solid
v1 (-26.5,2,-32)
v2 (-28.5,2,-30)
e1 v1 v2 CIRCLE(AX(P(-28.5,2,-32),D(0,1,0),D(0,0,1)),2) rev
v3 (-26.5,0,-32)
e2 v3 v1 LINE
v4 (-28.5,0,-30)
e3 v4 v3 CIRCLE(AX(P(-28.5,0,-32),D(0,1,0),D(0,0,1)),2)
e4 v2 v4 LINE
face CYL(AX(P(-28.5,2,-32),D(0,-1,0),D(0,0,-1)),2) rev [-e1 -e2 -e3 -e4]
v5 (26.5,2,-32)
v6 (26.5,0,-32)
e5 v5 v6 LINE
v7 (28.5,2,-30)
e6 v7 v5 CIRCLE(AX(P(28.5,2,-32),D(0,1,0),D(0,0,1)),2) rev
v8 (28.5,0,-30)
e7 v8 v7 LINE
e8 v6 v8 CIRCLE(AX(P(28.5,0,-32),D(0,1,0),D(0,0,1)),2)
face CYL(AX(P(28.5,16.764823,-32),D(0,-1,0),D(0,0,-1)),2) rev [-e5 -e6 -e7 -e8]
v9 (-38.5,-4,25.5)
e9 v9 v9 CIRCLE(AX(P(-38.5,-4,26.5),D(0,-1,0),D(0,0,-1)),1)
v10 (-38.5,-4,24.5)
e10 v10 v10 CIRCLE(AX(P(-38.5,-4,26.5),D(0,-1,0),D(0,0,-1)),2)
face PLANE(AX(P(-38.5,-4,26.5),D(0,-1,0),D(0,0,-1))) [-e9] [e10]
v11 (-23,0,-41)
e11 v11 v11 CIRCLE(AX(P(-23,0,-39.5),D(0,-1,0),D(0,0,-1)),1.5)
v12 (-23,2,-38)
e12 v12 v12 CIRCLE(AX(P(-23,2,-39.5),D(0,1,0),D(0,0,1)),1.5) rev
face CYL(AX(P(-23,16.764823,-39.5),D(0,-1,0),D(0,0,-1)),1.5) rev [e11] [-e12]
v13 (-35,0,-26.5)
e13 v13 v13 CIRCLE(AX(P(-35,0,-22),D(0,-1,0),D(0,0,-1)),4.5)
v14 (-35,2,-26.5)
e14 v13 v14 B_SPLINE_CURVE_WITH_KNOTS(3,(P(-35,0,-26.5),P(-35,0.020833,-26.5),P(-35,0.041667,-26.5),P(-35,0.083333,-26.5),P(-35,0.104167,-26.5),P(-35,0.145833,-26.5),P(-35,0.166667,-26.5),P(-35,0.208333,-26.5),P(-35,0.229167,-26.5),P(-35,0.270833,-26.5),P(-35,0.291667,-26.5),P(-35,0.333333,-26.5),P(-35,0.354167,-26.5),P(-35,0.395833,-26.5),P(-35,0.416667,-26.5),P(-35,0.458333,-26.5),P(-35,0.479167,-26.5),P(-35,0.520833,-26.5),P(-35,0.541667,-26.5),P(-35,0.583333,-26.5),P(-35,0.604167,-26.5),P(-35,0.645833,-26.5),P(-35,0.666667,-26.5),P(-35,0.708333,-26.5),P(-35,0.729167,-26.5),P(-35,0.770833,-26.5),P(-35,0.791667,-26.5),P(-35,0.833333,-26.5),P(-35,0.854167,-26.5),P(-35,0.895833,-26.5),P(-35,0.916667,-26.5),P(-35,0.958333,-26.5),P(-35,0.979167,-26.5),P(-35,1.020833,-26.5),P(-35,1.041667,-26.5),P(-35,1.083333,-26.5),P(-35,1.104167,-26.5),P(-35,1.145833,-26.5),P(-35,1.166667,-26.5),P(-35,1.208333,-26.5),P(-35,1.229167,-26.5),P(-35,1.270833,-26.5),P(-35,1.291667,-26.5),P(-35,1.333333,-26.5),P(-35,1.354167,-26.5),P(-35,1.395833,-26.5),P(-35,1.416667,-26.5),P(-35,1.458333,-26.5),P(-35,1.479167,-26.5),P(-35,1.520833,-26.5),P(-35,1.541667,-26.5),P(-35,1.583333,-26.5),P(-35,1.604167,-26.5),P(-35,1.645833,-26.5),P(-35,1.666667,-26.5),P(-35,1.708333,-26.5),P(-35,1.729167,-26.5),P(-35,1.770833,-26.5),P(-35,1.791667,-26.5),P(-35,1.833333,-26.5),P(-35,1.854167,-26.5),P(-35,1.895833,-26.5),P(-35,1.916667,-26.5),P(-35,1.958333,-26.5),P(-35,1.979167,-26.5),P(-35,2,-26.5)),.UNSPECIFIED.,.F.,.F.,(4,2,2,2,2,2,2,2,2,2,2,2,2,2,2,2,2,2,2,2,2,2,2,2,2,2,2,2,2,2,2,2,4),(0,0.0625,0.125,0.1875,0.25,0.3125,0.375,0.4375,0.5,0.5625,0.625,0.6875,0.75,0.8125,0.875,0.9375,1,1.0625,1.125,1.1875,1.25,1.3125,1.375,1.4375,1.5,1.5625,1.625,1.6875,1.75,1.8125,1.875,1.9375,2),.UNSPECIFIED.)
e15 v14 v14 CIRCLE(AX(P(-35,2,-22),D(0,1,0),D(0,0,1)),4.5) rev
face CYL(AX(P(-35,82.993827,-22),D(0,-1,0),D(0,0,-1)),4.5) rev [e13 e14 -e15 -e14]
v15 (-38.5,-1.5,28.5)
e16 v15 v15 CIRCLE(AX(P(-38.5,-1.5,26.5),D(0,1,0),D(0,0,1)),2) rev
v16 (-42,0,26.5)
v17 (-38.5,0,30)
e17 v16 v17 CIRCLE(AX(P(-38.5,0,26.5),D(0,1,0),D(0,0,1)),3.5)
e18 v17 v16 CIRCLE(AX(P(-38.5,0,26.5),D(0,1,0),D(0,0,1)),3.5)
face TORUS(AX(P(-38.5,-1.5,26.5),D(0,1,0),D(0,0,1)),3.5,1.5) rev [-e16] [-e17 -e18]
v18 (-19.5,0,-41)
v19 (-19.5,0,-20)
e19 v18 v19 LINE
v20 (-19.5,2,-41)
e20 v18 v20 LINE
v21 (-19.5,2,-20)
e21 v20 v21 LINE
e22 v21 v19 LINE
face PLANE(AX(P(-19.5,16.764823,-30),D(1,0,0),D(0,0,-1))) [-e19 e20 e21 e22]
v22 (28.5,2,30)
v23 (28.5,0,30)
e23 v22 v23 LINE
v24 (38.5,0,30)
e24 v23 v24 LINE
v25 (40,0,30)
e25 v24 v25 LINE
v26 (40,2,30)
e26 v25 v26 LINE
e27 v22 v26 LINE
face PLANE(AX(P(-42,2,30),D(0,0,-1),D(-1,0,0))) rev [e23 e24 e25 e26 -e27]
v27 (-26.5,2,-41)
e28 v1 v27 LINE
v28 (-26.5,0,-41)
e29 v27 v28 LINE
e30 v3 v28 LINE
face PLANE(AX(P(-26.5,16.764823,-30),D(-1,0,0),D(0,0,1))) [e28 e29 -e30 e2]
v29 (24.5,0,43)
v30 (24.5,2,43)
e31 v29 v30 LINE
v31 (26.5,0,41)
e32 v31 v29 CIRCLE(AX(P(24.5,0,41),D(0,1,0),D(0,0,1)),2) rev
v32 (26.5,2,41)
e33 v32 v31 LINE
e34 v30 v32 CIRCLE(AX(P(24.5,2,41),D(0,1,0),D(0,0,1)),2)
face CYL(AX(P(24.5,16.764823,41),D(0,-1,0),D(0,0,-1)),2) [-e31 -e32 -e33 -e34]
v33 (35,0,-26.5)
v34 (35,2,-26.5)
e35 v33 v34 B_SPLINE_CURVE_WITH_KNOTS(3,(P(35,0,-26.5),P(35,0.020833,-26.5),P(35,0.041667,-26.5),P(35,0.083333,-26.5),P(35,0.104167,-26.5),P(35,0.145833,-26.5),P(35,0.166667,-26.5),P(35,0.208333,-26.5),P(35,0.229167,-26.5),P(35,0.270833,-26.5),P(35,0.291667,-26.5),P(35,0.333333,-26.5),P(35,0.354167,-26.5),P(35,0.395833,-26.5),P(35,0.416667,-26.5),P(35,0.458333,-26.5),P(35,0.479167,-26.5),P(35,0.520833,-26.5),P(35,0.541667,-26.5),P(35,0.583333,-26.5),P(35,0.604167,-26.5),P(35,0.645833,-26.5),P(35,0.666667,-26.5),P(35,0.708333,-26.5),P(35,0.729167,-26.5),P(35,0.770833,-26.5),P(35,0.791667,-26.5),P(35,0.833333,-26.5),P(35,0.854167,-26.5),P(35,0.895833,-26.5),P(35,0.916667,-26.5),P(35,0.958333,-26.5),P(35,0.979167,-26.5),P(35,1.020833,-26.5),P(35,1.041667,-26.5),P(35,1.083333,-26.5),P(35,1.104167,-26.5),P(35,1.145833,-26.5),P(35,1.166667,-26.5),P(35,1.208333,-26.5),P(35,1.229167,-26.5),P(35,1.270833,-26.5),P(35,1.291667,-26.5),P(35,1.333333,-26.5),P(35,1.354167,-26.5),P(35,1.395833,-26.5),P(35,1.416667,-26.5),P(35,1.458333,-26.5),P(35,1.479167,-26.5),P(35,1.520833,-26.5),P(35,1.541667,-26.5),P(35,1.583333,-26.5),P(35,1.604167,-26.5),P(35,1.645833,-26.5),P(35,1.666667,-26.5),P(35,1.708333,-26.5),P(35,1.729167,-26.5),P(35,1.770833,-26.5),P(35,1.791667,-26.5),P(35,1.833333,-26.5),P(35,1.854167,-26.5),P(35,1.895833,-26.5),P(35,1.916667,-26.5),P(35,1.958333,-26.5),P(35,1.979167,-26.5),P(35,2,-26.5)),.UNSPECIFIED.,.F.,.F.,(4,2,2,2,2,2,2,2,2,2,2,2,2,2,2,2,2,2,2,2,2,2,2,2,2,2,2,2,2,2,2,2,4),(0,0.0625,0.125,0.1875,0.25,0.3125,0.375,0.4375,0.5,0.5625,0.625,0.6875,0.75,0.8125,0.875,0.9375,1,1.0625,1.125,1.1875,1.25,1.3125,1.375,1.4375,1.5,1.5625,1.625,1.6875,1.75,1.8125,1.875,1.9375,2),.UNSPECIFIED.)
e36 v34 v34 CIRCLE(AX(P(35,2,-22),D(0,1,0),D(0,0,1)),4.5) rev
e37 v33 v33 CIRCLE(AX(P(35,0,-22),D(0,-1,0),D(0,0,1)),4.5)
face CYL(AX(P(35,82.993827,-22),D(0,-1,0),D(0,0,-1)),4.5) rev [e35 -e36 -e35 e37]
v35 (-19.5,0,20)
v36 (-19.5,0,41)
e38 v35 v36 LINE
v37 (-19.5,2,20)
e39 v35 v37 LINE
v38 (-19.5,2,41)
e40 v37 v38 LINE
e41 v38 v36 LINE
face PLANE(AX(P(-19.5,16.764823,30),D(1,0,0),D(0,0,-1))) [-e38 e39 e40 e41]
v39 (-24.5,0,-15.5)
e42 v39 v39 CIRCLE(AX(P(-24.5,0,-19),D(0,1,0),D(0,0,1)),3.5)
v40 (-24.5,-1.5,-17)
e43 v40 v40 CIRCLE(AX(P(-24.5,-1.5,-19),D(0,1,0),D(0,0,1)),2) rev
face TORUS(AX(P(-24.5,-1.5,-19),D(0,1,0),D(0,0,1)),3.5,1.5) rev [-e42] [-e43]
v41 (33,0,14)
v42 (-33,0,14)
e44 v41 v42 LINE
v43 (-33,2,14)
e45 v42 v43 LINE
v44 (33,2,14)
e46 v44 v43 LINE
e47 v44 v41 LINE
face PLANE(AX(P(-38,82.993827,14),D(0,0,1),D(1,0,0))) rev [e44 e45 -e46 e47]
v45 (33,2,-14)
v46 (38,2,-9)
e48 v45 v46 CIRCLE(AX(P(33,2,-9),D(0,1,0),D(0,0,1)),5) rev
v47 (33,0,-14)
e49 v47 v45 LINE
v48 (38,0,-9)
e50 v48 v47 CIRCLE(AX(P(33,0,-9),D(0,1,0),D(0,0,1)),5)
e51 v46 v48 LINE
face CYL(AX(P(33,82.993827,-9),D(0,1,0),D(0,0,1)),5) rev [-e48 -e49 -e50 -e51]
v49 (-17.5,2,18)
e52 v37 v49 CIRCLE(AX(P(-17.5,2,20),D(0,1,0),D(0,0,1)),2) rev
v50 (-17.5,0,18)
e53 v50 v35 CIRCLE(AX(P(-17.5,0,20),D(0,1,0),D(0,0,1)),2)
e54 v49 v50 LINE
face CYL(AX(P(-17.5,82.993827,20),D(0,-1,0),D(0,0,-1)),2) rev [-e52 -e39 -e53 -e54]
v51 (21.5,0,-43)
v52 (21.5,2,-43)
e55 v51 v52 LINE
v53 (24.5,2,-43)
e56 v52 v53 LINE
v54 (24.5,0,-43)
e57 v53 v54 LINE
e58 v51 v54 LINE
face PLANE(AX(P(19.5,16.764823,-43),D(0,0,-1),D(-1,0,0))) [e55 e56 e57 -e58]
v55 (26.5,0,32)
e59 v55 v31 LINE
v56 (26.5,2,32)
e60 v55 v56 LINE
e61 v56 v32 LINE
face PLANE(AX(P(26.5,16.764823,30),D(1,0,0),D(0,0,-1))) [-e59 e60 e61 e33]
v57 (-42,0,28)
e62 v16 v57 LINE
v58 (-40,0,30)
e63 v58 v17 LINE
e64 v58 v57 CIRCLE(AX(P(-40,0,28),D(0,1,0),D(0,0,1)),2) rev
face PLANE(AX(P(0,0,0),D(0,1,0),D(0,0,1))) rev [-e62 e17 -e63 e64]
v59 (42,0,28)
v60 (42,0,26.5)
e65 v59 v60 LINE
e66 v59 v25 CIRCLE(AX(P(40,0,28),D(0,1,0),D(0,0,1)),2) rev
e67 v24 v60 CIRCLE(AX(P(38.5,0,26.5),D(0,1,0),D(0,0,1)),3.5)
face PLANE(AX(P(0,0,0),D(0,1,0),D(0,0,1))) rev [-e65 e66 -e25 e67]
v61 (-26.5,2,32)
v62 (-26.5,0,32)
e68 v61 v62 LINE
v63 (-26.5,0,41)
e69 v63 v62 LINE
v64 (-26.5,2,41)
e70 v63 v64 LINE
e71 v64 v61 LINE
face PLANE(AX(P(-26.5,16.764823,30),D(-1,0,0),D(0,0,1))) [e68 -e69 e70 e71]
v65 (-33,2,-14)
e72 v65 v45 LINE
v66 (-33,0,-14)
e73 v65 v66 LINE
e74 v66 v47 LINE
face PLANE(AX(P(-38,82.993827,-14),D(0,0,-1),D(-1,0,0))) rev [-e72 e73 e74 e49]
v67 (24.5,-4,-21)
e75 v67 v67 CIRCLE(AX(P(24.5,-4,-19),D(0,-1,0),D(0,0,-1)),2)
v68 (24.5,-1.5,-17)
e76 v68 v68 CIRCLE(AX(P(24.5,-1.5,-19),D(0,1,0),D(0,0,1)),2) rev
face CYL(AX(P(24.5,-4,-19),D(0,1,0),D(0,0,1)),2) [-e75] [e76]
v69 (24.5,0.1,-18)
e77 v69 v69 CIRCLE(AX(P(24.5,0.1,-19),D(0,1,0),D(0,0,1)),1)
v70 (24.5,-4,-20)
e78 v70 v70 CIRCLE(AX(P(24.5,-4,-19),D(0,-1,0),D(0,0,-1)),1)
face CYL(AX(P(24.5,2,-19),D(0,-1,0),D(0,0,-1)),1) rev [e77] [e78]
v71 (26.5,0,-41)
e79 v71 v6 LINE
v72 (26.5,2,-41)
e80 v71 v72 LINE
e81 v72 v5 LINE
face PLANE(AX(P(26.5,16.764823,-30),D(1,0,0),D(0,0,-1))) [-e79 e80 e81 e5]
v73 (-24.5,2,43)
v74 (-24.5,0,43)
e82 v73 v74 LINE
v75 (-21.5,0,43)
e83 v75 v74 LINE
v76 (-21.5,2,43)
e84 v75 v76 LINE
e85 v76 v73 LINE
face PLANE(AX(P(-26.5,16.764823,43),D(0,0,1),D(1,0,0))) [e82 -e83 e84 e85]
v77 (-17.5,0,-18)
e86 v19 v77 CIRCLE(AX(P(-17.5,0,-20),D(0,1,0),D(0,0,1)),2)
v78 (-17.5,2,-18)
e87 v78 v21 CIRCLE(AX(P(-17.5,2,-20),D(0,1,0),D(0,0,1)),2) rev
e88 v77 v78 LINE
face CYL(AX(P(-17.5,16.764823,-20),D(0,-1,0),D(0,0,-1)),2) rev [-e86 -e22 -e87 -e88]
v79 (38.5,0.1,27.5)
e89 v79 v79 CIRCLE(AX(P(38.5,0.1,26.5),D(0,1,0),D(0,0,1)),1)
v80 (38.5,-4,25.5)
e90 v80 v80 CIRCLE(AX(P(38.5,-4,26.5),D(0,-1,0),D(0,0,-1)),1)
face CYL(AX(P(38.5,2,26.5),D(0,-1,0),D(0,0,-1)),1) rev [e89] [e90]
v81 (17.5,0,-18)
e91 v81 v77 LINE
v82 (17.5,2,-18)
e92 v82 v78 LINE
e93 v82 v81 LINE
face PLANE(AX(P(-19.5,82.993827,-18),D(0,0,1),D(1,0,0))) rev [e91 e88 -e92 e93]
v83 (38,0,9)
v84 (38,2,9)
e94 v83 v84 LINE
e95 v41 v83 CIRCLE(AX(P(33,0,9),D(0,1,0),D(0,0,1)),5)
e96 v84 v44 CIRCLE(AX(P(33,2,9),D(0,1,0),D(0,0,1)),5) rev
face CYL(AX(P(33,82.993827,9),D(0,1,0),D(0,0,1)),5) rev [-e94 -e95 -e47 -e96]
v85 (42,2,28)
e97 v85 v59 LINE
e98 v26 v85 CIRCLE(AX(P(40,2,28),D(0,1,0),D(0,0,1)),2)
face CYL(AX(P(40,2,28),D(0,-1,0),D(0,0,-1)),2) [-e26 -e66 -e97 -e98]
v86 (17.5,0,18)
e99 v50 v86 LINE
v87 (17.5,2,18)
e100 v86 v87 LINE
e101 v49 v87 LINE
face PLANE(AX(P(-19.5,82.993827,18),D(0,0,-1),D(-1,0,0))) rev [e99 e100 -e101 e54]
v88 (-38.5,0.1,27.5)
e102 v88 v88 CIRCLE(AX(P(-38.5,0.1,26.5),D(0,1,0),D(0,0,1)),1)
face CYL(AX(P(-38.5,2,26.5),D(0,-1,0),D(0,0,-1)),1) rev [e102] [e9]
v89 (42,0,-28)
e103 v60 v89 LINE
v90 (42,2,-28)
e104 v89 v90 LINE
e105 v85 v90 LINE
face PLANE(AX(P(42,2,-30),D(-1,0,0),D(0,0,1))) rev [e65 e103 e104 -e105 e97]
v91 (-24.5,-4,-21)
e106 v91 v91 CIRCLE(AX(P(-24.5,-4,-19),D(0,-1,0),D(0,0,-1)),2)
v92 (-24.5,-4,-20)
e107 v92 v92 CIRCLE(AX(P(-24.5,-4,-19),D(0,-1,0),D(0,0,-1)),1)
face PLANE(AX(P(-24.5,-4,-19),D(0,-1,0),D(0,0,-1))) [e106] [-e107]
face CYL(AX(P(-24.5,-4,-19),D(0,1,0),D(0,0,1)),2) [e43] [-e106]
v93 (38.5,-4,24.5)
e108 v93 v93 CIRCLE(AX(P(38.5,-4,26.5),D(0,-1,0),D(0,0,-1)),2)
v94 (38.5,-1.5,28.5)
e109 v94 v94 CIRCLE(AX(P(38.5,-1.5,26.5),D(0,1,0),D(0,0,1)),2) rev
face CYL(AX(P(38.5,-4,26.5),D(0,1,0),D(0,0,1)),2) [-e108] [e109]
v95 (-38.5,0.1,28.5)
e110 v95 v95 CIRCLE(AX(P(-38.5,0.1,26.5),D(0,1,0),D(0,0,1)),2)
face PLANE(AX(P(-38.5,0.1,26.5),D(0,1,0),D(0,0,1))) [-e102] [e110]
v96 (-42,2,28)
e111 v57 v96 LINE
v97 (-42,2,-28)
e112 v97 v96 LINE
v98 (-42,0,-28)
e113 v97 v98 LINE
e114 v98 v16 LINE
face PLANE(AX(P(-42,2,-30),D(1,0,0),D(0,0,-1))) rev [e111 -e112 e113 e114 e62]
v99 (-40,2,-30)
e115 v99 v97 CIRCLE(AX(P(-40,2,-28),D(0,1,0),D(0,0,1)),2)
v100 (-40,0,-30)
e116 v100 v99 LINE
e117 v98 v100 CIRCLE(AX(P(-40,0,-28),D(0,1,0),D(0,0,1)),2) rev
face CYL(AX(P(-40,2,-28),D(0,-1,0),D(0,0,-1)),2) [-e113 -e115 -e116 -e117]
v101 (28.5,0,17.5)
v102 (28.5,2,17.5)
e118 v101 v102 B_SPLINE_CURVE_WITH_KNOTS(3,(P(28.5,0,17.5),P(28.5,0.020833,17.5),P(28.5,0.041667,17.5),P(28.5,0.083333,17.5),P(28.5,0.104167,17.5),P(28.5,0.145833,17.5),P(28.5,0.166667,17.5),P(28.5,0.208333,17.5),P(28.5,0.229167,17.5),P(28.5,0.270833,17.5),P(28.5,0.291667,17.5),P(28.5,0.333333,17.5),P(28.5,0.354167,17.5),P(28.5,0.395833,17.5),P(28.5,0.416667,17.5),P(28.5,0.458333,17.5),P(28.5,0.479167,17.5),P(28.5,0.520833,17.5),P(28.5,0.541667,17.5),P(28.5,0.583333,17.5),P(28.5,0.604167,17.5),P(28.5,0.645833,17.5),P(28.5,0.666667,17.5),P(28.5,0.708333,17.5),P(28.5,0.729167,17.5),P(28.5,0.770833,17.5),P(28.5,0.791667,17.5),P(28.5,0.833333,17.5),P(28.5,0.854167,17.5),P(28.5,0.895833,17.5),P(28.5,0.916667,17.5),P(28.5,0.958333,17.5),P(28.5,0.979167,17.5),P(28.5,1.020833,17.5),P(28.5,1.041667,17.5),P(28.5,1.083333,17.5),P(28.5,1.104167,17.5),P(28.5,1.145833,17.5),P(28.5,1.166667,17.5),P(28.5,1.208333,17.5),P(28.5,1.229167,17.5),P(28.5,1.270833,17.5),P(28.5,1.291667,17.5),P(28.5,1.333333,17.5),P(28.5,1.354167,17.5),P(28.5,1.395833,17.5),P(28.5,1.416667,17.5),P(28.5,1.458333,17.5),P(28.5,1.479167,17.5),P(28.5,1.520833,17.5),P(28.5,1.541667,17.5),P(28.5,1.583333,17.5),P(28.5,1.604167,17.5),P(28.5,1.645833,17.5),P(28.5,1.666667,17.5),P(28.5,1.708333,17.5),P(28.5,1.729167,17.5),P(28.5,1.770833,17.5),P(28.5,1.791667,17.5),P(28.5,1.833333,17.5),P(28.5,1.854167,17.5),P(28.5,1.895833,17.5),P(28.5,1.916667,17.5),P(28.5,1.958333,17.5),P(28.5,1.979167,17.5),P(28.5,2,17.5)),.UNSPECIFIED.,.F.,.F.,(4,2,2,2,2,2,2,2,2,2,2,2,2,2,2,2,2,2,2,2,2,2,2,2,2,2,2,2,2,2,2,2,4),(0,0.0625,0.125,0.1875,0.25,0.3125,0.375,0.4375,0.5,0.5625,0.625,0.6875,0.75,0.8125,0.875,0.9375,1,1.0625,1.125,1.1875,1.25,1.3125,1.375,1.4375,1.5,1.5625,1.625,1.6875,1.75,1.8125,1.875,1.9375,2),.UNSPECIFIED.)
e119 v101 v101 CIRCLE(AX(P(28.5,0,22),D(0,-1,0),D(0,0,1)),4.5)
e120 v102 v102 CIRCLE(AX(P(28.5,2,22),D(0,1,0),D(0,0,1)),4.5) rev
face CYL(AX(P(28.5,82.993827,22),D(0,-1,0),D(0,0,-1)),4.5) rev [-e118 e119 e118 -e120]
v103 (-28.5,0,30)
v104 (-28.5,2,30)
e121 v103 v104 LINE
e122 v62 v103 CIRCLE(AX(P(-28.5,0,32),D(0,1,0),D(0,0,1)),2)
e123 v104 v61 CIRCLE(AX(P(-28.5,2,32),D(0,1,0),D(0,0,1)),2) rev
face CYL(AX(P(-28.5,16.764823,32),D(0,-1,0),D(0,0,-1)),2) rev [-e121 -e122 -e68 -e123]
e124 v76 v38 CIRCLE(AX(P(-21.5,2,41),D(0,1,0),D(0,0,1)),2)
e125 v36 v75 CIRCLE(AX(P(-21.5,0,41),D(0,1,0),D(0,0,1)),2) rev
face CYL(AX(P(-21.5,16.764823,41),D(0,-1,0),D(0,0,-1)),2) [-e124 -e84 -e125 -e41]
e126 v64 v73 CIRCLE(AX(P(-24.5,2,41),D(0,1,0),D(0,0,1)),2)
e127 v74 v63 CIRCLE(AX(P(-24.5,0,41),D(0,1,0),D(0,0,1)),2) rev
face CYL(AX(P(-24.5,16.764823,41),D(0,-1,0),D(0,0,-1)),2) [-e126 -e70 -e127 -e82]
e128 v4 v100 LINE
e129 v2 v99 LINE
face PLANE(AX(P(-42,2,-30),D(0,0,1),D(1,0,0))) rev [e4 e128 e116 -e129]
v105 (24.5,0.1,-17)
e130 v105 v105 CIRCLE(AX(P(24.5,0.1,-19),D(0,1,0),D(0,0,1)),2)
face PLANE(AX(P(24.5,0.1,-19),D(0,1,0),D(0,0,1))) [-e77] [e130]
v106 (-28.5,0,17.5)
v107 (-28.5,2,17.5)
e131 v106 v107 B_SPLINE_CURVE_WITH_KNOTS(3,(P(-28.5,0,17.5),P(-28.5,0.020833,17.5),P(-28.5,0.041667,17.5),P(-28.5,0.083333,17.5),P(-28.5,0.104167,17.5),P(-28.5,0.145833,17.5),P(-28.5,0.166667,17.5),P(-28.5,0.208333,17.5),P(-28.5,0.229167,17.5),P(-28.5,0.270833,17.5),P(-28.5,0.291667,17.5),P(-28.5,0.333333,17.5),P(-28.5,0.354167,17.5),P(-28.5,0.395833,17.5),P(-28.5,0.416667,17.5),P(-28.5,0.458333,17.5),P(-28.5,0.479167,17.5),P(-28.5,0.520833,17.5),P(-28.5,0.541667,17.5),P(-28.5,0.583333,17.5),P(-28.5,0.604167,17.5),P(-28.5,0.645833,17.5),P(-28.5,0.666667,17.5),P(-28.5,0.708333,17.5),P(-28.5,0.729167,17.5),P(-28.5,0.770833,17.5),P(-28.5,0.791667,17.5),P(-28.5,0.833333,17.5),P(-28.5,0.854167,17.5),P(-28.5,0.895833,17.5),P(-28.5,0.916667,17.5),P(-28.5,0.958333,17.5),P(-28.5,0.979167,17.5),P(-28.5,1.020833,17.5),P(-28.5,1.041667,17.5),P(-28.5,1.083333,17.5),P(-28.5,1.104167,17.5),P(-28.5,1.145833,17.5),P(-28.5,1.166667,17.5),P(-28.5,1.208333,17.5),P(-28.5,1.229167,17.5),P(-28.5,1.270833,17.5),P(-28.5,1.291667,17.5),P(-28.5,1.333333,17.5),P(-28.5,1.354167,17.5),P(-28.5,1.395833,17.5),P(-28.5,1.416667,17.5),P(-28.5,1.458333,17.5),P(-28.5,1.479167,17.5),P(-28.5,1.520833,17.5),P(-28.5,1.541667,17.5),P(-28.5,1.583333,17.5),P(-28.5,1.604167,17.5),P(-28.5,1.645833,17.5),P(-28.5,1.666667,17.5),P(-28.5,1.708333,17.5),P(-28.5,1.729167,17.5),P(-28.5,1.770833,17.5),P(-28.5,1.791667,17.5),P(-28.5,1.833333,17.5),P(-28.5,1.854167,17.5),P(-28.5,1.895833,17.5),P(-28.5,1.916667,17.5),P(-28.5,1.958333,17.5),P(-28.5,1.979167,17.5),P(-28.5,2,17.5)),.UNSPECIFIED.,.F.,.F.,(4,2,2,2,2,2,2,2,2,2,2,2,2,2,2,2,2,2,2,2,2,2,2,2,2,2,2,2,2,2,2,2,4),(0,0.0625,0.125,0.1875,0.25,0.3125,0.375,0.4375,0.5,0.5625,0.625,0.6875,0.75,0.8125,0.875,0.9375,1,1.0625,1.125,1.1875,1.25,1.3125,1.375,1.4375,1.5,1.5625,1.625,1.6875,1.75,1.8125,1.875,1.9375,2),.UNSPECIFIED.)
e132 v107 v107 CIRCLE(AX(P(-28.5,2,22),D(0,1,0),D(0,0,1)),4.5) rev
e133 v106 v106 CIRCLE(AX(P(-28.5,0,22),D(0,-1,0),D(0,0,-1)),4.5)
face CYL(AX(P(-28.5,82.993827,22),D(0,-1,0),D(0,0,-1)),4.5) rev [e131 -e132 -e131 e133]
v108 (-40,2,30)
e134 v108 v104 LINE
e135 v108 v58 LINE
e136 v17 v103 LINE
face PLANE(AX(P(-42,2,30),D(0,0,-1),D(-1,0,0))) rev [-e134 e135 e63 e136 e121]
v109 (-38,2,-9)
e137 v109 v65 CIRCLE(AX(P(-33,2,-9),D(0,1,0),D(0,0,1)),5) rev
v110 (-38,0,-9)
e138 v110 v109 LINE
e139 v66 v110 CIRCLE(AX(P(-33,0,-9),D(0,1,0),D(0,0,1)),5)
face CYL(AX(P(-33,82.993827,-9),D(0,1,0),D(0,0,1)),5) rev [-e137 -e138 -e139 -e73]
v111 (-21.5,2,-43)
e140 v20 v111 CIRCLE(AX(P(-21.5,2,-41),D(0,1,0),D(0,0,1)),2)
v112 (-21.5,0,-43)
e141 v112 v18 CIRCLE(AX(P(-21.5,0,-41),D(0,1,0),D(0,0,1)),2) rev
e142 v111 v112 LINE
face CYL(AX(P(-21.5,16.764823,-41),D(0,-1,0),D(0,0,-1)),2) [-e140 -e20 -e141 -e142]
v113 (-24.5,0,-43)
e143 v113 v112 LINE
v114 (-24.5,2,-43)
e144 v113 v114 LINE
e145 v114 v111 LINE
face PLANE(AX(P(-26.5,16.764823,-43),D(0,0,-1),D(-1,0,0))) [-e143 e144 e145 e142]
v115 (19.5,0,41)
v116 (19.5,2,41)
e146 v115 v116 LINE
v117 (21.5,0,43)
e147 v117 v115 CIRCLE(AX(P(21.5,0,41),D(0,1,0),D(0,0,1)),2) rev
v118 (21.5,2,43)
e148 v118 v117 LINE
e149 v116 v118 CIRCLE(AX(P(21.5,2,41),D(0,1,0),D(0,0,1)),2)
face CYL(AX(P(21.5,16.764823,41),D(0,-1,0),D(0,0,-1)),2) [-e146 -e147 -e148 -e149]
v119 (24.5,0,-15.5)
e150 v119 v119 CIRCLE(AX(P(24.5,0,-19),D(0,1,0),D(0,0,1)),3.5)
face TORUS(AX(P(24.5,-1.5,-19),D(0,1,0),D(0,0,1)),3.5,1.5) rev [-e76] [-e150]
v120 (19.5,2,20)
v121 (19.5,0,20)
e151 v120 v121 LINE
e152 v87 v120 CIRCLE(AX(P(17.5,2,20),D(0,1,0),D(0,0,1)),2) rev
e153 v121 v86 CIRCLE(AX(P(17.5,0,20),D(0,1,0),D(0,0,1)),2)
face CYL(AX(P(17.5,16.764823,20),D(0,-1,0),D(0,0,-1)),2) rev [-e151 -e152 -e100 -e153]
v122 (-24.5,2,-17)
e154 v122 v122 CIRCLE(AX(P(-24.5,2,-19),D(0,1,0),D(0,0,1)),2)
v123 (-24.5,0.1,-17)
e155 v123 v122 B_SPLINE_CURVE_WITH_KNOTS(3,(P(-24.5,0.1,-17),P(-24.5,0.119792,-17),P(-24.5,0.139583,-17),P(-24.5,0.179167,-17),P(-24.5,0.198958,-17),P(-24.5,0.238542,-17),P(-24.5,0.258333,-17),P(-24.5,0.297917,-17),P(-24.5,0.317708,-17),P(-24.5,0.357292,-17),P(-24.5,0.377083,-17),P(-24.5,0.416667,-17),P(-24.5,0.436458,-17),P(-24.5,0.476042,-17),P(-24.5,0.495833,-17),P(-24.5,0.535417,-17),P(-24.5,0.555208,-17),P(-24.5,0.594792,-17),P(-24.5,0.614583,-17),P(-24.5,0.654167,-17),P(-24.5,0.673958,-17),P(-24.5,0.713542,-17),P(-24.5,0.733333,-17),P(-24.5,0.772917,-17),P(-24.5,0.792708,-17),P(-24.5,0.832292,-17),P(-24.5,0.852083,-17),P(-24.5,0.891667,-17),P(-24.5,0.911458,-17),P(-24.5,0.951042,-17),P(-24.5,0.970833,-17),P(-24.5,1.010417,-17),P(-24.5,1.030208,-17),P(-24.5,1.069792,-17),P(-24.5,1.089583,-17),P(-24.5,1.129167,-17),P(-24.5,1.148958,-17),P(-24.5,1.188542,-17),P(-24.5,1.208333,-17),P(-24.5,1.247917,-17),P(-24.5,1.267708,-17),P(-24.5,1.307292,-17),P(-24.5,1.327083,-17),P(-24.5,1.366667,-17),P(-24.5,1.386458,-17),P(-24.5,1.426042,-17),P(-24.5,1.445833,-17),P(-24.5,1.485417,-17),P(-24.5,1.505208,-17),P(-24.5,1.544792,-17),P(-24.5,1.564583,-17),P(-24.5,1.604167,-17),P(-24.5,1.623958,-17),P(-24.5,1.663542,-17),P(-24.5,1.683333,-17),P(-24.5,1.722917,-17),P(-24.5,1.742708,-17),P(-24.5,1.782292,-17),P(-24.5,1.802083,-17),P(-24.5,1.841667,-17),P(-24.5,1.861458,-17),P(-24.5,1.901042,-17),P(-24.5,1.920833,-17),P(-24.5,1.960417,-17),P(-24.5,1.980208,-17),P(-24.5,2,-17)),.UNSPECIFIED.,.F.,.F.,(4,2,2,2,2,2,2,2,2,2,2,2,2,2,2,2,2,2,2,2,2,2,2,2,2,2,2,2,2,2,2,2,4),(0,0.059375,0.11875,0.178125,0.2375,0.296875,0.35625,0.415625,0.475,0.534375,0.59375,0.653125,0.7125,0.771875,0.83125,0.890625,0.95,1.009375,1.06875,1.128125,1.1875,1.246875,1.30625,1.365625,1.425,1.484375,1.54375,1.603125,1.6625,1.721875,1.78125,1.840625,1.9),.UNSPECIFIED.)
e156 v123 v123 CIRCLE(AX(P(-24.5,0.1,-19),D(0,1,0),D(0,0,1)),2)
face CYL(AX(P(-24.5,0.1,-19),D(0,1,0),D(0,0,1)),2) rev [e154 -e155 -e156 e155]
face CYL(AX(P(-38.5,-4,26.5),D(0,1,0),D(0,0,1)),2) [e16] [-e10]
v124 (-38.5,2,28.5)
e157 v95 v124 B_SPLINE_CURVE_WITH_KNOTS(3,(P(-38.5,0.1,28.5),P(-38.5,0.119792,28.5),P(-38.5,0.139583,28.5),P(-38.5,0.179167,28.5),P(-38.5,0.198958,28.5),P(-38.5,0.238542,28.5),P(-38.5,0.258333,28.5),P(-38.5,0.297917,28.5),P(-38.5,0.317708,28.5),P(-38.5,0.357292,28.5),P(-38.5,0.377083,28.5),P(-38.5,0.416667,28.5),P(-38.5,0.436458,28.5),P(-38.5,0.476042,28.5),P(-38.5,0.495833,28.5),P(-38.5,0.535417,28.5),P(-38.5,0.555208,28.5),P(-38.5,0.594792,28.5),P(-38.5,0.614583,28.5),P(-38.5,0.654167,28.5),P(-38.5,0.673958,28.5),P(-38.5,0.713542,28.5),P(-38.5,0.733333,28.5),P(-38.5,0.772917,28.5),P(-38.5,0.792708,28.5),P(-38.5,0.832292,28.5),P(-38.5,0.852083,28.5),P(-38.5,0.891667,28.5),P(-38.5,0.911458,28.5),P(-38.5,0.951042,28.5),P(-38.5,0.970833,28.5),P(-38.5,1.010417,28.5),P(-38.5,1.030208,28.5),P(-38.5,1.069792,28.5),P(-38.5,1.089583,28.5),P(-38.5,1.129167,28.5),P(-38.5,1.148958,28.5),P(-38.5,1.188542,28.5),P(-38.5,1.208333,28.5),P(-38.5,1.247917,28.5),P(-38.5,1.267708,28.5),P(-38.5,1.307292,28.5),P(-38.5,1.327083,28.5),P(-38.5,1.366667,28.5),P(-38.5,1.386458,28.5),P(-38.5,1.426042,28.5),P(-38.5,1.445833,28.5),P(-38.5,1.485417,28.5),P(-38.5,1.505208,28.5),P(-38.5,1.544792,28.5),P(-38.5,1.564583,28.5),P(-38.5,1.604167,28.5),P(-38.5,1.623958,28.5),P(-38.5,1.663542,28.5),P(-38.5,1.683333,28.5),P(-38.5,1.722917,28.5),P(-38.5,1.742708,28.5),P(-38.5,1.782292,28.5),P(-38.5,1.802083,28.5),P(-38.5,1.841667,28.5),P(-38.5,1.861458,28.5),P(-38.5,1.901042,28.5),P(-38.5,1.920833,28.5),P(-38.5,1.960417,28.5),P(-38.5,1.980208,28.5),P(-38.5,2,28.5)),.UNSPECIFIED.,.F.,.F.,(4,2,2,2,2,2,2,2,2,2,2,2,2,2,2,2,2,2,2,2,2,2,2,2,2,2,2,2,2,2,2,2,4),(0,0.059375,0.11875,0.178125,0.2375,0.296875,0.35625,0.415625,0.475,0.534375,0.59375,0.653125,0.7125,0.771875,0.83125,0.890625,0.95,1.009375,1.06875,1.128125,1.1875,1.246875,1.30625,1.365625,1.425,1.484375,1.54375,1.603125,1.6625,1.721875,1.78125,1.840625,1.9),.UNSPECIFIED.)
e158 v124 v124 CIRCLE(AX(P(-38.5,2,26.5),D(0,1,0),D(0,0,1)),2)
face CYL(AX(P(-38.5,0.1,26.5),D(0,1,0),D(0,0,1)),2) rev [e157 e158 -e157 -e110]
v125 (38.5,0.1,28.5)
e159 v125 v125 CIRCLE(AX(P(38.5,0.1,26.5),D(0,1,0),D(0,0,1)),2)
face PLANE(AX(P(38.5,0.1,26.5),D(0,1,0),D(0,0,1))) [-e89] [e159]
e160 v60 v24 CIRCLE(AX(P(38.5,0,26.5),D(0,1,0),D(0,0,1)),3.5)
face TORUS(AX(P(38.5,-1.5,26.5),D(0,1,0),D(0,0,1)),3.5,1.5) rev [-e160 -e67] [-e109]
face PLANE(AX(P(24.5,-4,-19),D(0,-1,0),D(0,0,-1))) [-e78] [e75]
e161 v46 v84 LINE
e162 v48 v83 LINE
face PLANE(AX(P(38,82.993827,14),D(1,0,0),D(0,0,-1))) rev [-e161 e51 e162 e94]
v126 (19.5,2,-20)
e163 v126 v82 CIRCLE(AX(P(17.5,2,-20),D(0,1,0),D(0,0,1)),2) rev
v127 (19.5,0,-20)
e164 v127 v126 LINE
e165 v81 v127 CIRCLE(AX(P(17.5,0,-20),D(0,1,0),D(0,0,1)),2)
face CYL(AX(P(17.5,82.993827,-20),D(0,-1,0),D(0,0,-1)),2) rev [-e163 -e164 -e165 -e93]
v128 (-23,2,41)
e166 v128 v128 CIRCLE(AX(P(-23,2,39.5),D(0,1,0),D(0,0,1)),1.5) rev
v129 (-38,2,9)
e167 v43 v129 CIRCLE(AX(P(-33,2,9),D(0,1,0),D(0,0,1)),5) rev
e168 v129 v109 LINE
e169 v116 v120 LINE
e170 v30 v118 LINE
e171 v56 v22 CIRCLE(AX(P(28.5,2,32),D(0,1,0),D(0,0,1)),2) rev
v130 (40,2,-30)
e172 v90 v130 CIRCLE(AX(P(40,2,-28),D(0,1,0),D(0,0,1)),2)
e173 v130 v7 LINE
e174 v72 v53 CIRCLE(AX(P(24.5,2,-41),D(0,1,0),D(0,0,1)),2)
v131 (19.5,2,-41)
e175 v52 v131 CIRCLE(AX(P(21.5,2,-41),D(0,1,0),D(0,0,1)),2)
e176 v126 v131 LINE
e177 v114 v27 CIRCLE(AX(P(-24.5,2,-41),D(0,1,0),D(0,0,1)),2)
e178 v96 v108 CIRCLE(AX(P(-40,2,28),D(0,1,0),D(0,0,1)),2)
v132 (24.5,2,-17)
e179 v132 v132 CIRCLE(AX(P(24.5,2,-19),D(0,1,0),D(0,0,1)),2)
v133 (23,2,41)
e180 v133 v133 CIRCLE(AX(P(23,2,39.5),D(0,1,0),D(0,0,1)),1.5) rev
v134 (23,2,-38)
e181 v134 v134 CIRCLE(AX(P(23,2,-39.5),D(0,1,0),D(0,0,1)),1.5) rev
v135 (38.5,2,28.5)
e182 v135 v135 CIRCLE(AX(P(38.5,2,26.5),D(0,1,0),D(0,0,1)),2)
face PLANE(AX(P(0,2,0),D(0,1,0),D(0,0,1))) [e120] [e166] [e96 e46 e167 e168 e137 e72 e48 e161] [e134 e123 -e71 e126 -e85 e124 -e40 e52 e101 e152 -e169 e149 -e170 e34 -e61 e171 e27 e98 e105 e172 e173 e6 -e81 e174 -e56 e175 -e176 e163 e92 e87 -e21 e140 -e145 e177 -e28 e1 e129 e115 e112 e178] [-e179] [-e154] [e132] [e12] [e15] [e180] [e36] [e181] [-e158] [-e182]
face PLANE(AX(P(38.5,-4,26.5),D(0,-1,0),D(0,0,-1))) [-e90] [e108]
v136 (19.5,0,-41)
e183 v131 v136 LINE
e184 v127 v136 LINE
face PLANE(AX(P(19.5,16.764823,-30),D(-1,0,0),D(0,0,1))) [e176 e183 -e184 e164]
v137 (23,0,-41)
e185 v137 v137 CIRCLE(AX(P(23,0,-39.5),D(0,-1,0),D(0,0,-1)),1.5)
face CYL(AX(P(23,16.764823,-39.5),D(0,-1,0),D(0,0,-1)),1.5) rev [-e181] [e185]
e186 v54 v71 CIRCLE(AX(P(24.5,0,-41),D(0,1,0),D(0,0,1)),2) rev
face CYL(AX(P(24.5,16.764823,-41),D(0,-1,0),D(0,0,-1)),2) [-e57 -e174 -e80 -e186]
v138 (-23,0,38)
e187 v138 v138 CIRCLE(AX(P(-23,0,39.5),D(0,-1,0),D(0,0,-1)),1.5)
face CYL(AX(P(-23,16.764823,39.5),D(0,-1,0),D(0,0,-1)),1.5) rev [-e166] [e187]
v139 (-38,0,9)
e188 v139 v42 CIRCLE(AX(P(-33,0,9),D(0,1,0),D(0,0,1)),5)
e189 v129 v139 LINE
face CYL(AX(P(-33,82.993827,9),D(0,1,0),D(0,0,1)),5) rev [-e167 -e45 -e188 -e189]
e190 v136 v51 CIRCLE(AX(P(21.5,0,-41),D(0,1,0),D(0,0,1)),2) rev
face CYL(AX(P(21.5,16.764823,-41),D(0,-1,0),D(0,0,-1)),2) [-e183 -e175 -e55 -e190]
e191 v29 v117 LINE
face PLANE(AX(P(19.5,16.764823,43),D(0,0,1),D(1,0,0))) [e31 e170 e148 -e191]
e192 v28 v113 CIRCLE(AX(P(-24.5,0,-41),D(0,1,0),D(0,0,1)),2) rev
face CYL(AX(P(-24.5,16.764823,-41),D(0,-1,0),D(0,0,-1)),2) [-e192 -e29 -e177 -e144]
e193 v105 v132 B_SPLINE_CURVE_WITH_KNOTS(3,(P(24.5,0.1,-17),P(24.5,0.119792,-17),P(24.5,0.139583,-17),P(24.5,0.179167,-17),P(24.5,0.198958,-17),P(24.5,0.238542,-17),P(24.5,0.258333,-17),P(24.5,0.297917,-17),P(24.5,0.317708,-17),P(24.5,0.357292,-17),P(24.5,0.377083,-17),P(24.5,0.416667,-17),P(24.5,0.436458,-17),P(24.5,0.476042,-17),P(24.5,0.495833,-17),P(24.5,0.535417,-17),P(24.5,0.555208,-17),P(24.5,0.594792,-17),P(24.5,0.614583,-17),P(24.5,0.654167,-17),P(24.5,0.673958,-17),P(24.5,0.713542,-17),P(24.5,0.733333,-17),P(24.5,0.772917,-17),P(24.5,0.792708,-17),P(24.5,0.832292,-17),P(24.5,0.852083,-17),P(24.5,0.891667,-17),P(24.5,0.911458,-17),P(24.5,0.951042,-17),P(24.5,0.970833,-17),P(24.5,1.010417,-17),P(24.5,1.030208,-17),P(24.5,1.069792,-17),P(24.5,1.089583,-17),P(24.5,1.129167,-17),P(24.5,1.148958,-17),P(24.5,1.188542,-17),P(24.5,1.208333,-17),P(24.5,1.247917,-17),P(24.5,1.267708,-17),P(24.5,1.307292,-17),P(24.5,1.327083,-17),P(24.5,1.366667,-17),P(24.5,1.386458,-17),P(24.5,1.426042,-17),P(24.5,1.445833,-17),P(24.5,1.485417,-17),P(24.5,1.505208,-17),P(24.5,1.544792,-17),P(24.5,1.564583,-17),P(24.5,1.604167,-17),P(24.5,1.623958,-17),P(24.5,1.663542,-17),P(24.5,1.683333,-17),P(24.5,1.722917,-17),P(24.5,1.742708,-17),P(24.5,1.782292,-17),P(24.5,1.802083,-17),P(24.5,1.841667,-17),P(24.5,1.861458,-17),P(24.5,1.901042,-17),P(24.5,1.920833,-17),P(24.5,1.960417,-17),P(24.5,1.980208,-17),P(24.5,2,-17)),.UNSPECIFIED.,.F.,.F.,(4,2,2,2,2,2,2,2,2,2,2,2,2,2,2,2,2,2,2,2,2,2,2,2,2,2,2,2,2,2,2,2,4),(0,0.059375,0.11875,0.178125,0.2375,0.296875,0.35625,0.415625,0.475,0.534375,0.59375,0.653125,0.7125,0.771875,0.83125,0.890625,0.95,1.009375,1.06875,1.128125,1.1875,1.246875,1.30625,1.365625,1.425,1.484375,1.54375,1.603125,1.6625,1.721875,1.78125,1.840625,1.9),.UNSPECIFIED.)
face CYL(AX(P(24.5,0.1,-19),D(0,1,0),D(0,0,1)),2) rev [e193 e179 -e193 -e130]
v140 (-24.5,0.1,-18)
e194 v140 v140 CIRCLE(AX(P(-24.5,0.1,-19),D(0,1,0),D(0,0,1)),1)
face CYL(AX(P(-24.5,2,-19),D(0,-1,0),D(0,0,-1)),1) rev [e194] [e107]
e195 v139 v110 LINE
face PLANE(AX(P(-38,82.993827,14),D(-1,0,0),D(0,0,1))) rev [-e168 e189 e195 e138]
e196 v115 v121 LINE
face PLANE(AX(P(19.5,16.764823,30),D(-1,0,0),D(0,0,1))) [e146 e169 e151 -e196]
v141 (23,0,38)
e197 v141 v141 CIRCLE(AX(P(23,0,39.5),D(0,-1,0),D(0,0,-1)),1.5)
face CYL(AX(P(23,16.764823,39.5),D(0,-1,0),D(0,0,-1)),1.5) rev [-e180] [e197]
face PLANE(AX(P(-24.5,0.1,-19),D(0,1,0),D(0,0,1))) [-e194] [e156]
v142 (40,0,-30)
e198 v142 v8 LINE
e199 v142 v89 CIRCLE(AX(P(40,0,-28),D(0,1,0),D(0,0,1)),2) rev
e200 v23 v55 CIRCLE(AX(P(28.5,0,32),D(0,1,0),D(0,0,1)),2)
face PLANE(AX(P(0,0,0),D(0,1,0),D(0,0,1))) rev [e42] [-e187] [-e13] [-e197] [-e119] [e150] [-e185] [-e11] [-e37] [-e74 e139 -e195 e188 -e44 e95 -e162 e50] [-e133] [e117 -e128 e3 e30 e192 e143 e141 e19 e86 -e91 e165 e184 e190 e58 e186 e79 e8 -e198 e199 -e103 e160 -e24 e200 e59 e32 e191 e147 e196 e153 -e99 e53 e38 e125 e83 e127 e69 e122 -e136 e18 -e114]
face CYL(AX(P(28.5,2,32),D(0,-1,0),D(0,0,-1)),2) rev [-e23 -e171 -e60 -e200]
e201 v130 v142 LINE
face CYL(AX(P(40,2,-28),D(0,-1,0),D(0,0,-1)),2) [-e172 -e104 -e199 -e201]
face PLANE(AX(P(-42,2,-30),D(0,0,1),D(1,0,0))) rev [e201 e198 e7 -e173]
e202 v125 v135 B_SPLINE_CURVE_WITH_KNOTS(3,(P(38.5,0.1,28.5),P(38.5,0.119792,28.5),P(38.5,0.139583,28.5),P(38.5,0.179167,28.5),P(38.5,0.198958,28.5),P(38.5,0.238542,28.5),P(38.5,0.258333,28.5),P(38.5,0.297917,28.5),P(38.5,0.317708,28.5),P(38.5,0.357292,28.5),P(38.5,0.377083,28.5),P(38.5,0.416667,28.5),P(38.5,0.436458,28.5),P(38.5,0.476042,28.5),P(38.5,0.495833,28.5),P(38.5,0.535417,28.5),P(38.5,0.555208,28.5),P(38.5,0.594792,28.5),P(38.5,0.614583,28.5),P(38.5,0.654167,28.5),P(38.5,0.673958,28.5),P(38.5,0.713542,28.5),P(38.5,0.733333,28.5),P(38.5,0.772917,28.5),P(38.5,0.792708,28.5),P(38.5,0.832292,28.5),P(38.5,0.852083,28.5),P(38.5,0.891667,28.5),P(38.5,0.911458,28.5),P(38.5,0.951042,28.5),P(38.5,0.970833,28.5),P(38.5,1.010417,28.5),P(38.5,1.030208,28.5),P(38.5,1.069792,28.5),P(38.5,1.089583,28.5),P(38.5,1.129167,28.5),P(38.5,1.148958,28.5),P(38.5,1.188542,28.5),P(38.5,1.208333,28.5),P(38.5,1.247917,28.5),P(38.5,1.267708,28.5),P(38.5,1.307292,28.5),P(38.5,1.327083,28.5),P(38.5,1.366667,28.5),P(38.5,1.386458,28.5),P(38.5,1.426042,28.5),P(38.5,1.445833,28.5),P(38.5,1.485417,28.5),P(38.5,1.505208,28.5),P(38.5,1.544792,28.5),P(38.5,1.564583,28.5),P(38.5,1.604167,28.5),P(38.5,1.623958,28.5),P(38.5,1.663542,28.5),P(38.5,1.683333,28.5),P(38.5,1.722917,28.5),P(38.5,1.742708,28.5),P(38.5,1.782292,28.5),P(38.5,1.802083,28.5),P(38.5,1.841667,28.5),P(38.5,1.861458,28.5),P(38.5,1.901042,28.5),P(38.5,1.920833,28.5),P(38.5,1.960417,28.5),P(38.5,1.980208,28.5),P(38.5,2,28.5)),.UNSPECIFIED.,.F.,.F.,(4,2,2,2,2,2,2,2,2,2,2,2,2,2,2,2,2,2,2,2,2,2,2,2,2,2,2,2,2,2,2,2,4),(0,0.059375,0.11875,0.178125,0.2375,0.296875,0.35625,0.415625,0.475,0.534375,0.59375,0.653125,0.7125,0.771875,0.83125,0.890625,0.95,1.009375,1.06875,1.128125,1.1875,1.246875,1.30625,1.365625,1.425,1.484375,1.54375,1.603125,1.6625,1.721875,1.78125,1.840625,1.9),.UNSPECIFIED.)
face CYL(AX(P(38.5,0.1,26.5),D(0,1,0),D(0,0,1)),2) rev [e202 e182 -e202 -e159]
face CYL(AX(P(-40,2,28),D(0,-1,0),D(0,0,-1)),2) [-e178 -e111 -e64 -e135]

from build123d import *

# Parameters (mm, degrees)
SKETCH_1_W          = 84
SKETCH_1_H          = 60
SKETCH_1_R          = 1
EXTRUDE_1_DEPTH     = 2
SKETCH_3_R          = 2
CUT_EXTRUDE_1_DEPTH = 1.9
SKETCH_4_R          = 2
SKETCH_4_R_2        = 1
EXTRUDE_2_DEPTH     = 4
FILLET_1_R          = 1.5
FILLET_3_R          = 2
SKETCH_6_W          = 7
SKETCH_6_H          = 13
SKETCH_6_R          = 1.5
EXTRUDE_4_DEPTH     = 2
CUT_EXTRUDE_2_REACH = 62.241
SKETCH_5_R          = 4.5
SKETCH_5_W          = 39
SKETCH_5_H          = 12
SKETCH_5_W_2        = 76
SKETCH_5_H_2        = 28
FILLET_6_R          = 2
FILLET_7_R          = 2
FILLET_8_R          = 5


with BuildPart() as part:
    # 草图1 → 凸台-拉伸1 (new body)
    with BuildSketch(Plane(origin=(0, 0, 0), x_dir=(1, 0, 0), z_dir=(0, 1, 0))):
        Rectangle(SKETCH_1_W, SKETCH_1_H)
        with Locations(Location((-38.5, -26.5, 0), (0, 0, 270))):
            Circle(SKETCH_1_R, mode=Mode.SUBTRACT)
        with Locations(Location((38.5, -26.5, 0), (0, 0, 270))):
            Circle(SKETCH_1_R, mode=Mode.SUBTRACT)
        with Locations(Location((-24.5, 19, 0), (0, 0, 270))):
            Circle(SKETCH_1_R, mode=Mode.SUBTRACT)
        with Locations(Location((24.5, 19, 0), (0, 0, 270))):
            Circle(SKETCH_1_R, mode=Mode.SUBTRACT)
    extrude(amount=EXTRUDE_1_DEPTH)

    # 草图3 → 切除-拉伸1 (cut)
    with BuildSketch(Plane(origin=(0, 2, 0), x_dir=(1, 0, 0), z_dir=(0, 1, 0))):
        with Locations(Location((-24.5, 19, 0), (0, 0, 270))):
            Circle(SKETCH_3_R)
        with Locations(Location((24.5, 19, 0), (0, 0, 270))):
            Circle(SKETCH_3_R)
        with Locations(Location((38.5, -26.5, 0), (0, 0, 270))):
            Circle(SKETCH_3_R)
        with Locations(Location((-38.5, -26.5, 0), (0, 0, 270))):
            Circle(SKETCH_3_R)
    extrude(amount=-CUT_EXTRUDE_1_DEPTH, mode=Mode.SUBTRACT)

    # 草图4 → 凸台-拉伸2 (add)
    # profile 1 of 4: a face of its own
    with BuildSketch(Plane.XZ):
        with Locations(Location((-38.5, 26.5, 0), (0, 0, 90))):
            Circle(SKETCH_4_R)
        with Locations(Location((-38.5, 26.5, 0), (0, 0, 270))):
            Circle(SKETCH_4_R_2, mode=Mode.SUBTRACT)
    # profile 2 of 4: a face of its own
    with BuildSketch(Plane.XZ):
        with Locations(Location((38.5, 26.5, 0), (0, 0, 90))):
            Circle(SKETCH_4_R)
        with Locations(Location((38.5, 26.5, 0), (0, 0, 270))):
            Circle(SKETCH_4_R_2, mode=Mode.SUBTRACT)
    # profile 3 of 4: a face of its own
    with BuildSketch(Plane.XZ):
        with Locations(Location((24.5, -19, 0), (0, 0, 90))):
            Circle(SKETCH_4_R)
        with Locations(Location((24.5, -19, 0), (0, 0, 270))):
            Circle(SKETCH_4_R_2, mode=Mode.SUBTRACT)
    # profile 4 of 4: a face of its own
    with BuildSketch(Plane.XZ):
        with Locations(Location((-24.5, -19, 0), (0, 0, 90))):
            Circle(SKETCH_4_R)
        with Locations(Location((-24.5, -19, 0), (0, 0, 270))):
            Circle(SKETCH_4_R_2, mode=Mode.SUBTRACT)
    extrude(amount=EXTRUDE_2_DEPTH)

    # 圆角1
    fillet_1_edges = [part.edges().sort_by_distance(p)[0] for p in [
        (-38.5, 0, 24.5),
        (38.5, 0, 24.5),
        (24.5, 0, -21),
        (-24.5, 0, -21),
    ]]
    fillet(fillet_1_edges, radius=FILLET_1_R - 0.0001)  # a hair under: the kernel refuses the full size

    # 圆角3
    fillet_3_edges = [part.edges().sort_by_distance(p)[0] for p in [
        (42, 1, 30),
        (-42, 1, 30),
        (-42, 1, -30),
        (42, 1, -30),
    ]]
    fillet(fillet_3_edges, radius=FILLET_3_R)

    # 草图6 → 凸台-拉伸4 (add)
    # profile 1 of 4: a face of its own
    with BuildSketch(Plane.XZ):
        with Locations((-23, 36.5)):
            Rectangle(SKETCH_6_W, SKETCH_6_H)
        with Locations(Location((-23, 39.5, 0), (0, 0, 270))):
            Circle(SKETCH_6_R, mode=Mode.SUBTRACT)
    # profile 2 of 4: a face of its own
    with BuildSketch(Plane.XZ):
        with Locations((23, 36.5)):
            Rectangle(SKETCH_6_W, SKETCH_6_H)
        with Locations(Location((23, 39.5, 0), (0, 0, 270))):
            Circle(SKETCH_6_R, mode=Mode.SUBTRACT)
    # profile 3 of 4: a face of its own
    with BuildSketch(Plane.XZ):
        with Locations((23, -36.5)):
            Rectangle(SKETCH_6_W, SKETCH_6_H)
        with Locations(Location((23, -39.5, 0), (0, 0, 270))):
            Circle(SKETCH_6_R, mode=Mode.SUBTRACT)
    # profile 4 of 4: a face of its own
    with BuildSketch(Plane.XZ):
        with Locations((-23, -36.5)):
            Rectangle(SKETCH_6_W, SKETCH_6_H)
        with Locations(Location((-23, -39.5, 0), (0, 0, 270))):
            Circle(SKETCH_6_R, mode=Mode.SUBTRACT)
    extrude(amount=-EXTRUDE_4_DEPTH)

    # 草图5 → 切除-拉伸2 (cut, up to next)
    with BuildSketch(Plane.XZ, mode=Mode.PRIVATE) as cut_extrude_2_sk1:
        with Locations(Location((-28.5, 22, 0), (0, 0, 270))):
            Circle(SKETCH_5_R)
    cut_extrude_2_tool1 = extrude(cut_extrude_2_sk1.sketch, amount=-CUT_EXTRUDE_2_REACH, mode=Mode.PRIVATE) & part.part
    # 草图5 → 切除-拉伸2 (cut, up to next)
    with BuildSketch(Plane.XZ, mode=Mode.PRIVATE) as cut_extrude_2_sk2:
        with Locations(Location((-35, -22, 0), (0, 0, 270))):
            Circle(SKETCH_5_R)
    cut_extrude_2_tool2 = extrude(cut_extrude_2_sk2.sketch, amount=-CUT_EXTRUDE_2_REACH, mode=Mode.PRIVATE) & part.part
    # 草图5 → 切除-拉伸2 (cut, up to next)
    with BuildSketch(Plane.XZ, mode=Mode.PRIVATE) as cut_extrude_2_sk3:
        with Locations(Location((35, -22, 0), (0, 0, 270))):
            Circle(SKETCH_5_R)
    cut_extrude_2_tool3 = extrude(cut_extrude_2_sk3.sketch, amount=-CUT_EXTRUDE_2_REACH, mode=Mode.PRIVATE) & part.part
    # 草图5 → 切除-拉伸2 (cut, up to next)
    with BuildSketch(Plane.XZ, mode=Mode.PRIVATE) as cut_extrude_2_sk4:
        with Locations(Location((28.5, 22, 0), (0, 0, 270))):
            Circle(SKETCH_5_R)
    cut_extrude_2_tool4 = extrude(cut_extrude_2_sk4.sketch, amount=-CUT_EXTRUDE_2_REACH, mode=Mode.PRIVATE) & part.part
    # 草图5 → 切除-拉伸2 (cut, up to next)
    with BuildSketch(Plane.XZ, mode=Mode.PRIVATE) as cut_extrude_2_sk5:
        with Locations((0, -24)):
            Rectangle(SKETCH_5_W, SKETCH_5_H)
    cut_extrude_2_tool5 = extrude(cut_extrude_2_sk5.sketch, amount=-CUT_EXTRUDE_2_REACH, mode=Mode.PRIVATE) & part.part
    # 草图5 → 切除-拉伸2 (cut, up to next)
    with BuildSketch(Plane.XZ, mode=Mode.PRIVATE) as cut_extrude_2_sk6:
        with Locations((0, 24)):
            Rectangle(SKETCH_5_W, SKETCH_5_H)
    cut_extrude_2_tool6 = extrude(cut_extrude_2_sk6.sketch, amount=-CUT_EXTRUDE_2_REACH, mode=Mode.PRIVATE) & part.part
    # 草图5 → 切除-拉伸2 (cut, up to next)
    with BuildSketch(Plane.XZ, mode=Mode.PRIVATE) as cut_extrude_2_sk7:
        Rectangle(SKETCH_5_W_2, SKETCH_5_H_2)
    cut_extrude_2_tool7 = extrude(cut_extrude_2_sk7.sketch, amount=-CUT_EXTRUDE_2_REACH, mode=Mode.PRIVATE) & part.part
    add(cut_extrude_2_tool1.solids().sort_by_distance((-28.5, 0, 22))[0], mode=Mode.SUBTRACT)
    add(cut_extrude_2_tool2.solids().sort_by_distance((-35, 0, -22))[0], mode=Mode.SUBTRACT)
    add(cut_extrude_2_tool3.solids().sort_by_distance((35, 0, -22))[0], mode=Mode.SUBTRACT)
    add(cut_extrude_2_tool4.solids().sort_by_distance((28.5, 0, 22))[0], mode=Mode.SUBTRACT)
    add(cut_extrude_2_tool5.solids().sort_by_distance((0, 0, -24))[0], mode=Mode.SUBTRACT)
    add(cut_extrude_2_tool6.solids().sort_by_distance((0, 0, 24))[0], mode=Mode.SUBTRACT)
    add(cut_extrude_2_tool7.solids().sort_by_distance((0, 0, 0))[0], mode=Mode.SUBTRACT)

    # 圆角6
    fillet_6_edges = [part.edges().sort_by_distance(p)[0] for p in [
        (-26.5, 1, 30),
        (26.5, 1, 30),
        (26.5, 1, -30),
        (-26.5, 1, -30),
        (19.5, 1, 18),
        (-19.5, 1, 18),
        (19.5, 1, -18),
        (-19.5, 1, -18),
    ]]
    fillet(fillet_6_edges, radius=FILLET_6_R)

    # 圆角7
    fillet_7_edges = [part.edges().sort_by_distance(p)[0] for p in [
        (-26.5, 1, 43),
        (-19.5, 1, 43),
        (19.5, 1, 43),
        (26.5, 1, 43),
        (19.5, 1, -43),
        (26.5, 1, -43),
        (-26.5, 1, -43),
        (-19.5, 1, -43),
    ]]
    fillet(fillet_7_edges, radius=FILLET_7_R)

    # 圆角8
    fillet_8_edges = [part.edges().sort_by_distance(p)[0] for p in [
        (-38, 1, 14),
        (-38, 1, -14),
        (38, 1, -14),
        (38, 1, 14),
    ]]
    fillet(fillet_8_edges, radius=FILLET_8_R)


solid = part.part
